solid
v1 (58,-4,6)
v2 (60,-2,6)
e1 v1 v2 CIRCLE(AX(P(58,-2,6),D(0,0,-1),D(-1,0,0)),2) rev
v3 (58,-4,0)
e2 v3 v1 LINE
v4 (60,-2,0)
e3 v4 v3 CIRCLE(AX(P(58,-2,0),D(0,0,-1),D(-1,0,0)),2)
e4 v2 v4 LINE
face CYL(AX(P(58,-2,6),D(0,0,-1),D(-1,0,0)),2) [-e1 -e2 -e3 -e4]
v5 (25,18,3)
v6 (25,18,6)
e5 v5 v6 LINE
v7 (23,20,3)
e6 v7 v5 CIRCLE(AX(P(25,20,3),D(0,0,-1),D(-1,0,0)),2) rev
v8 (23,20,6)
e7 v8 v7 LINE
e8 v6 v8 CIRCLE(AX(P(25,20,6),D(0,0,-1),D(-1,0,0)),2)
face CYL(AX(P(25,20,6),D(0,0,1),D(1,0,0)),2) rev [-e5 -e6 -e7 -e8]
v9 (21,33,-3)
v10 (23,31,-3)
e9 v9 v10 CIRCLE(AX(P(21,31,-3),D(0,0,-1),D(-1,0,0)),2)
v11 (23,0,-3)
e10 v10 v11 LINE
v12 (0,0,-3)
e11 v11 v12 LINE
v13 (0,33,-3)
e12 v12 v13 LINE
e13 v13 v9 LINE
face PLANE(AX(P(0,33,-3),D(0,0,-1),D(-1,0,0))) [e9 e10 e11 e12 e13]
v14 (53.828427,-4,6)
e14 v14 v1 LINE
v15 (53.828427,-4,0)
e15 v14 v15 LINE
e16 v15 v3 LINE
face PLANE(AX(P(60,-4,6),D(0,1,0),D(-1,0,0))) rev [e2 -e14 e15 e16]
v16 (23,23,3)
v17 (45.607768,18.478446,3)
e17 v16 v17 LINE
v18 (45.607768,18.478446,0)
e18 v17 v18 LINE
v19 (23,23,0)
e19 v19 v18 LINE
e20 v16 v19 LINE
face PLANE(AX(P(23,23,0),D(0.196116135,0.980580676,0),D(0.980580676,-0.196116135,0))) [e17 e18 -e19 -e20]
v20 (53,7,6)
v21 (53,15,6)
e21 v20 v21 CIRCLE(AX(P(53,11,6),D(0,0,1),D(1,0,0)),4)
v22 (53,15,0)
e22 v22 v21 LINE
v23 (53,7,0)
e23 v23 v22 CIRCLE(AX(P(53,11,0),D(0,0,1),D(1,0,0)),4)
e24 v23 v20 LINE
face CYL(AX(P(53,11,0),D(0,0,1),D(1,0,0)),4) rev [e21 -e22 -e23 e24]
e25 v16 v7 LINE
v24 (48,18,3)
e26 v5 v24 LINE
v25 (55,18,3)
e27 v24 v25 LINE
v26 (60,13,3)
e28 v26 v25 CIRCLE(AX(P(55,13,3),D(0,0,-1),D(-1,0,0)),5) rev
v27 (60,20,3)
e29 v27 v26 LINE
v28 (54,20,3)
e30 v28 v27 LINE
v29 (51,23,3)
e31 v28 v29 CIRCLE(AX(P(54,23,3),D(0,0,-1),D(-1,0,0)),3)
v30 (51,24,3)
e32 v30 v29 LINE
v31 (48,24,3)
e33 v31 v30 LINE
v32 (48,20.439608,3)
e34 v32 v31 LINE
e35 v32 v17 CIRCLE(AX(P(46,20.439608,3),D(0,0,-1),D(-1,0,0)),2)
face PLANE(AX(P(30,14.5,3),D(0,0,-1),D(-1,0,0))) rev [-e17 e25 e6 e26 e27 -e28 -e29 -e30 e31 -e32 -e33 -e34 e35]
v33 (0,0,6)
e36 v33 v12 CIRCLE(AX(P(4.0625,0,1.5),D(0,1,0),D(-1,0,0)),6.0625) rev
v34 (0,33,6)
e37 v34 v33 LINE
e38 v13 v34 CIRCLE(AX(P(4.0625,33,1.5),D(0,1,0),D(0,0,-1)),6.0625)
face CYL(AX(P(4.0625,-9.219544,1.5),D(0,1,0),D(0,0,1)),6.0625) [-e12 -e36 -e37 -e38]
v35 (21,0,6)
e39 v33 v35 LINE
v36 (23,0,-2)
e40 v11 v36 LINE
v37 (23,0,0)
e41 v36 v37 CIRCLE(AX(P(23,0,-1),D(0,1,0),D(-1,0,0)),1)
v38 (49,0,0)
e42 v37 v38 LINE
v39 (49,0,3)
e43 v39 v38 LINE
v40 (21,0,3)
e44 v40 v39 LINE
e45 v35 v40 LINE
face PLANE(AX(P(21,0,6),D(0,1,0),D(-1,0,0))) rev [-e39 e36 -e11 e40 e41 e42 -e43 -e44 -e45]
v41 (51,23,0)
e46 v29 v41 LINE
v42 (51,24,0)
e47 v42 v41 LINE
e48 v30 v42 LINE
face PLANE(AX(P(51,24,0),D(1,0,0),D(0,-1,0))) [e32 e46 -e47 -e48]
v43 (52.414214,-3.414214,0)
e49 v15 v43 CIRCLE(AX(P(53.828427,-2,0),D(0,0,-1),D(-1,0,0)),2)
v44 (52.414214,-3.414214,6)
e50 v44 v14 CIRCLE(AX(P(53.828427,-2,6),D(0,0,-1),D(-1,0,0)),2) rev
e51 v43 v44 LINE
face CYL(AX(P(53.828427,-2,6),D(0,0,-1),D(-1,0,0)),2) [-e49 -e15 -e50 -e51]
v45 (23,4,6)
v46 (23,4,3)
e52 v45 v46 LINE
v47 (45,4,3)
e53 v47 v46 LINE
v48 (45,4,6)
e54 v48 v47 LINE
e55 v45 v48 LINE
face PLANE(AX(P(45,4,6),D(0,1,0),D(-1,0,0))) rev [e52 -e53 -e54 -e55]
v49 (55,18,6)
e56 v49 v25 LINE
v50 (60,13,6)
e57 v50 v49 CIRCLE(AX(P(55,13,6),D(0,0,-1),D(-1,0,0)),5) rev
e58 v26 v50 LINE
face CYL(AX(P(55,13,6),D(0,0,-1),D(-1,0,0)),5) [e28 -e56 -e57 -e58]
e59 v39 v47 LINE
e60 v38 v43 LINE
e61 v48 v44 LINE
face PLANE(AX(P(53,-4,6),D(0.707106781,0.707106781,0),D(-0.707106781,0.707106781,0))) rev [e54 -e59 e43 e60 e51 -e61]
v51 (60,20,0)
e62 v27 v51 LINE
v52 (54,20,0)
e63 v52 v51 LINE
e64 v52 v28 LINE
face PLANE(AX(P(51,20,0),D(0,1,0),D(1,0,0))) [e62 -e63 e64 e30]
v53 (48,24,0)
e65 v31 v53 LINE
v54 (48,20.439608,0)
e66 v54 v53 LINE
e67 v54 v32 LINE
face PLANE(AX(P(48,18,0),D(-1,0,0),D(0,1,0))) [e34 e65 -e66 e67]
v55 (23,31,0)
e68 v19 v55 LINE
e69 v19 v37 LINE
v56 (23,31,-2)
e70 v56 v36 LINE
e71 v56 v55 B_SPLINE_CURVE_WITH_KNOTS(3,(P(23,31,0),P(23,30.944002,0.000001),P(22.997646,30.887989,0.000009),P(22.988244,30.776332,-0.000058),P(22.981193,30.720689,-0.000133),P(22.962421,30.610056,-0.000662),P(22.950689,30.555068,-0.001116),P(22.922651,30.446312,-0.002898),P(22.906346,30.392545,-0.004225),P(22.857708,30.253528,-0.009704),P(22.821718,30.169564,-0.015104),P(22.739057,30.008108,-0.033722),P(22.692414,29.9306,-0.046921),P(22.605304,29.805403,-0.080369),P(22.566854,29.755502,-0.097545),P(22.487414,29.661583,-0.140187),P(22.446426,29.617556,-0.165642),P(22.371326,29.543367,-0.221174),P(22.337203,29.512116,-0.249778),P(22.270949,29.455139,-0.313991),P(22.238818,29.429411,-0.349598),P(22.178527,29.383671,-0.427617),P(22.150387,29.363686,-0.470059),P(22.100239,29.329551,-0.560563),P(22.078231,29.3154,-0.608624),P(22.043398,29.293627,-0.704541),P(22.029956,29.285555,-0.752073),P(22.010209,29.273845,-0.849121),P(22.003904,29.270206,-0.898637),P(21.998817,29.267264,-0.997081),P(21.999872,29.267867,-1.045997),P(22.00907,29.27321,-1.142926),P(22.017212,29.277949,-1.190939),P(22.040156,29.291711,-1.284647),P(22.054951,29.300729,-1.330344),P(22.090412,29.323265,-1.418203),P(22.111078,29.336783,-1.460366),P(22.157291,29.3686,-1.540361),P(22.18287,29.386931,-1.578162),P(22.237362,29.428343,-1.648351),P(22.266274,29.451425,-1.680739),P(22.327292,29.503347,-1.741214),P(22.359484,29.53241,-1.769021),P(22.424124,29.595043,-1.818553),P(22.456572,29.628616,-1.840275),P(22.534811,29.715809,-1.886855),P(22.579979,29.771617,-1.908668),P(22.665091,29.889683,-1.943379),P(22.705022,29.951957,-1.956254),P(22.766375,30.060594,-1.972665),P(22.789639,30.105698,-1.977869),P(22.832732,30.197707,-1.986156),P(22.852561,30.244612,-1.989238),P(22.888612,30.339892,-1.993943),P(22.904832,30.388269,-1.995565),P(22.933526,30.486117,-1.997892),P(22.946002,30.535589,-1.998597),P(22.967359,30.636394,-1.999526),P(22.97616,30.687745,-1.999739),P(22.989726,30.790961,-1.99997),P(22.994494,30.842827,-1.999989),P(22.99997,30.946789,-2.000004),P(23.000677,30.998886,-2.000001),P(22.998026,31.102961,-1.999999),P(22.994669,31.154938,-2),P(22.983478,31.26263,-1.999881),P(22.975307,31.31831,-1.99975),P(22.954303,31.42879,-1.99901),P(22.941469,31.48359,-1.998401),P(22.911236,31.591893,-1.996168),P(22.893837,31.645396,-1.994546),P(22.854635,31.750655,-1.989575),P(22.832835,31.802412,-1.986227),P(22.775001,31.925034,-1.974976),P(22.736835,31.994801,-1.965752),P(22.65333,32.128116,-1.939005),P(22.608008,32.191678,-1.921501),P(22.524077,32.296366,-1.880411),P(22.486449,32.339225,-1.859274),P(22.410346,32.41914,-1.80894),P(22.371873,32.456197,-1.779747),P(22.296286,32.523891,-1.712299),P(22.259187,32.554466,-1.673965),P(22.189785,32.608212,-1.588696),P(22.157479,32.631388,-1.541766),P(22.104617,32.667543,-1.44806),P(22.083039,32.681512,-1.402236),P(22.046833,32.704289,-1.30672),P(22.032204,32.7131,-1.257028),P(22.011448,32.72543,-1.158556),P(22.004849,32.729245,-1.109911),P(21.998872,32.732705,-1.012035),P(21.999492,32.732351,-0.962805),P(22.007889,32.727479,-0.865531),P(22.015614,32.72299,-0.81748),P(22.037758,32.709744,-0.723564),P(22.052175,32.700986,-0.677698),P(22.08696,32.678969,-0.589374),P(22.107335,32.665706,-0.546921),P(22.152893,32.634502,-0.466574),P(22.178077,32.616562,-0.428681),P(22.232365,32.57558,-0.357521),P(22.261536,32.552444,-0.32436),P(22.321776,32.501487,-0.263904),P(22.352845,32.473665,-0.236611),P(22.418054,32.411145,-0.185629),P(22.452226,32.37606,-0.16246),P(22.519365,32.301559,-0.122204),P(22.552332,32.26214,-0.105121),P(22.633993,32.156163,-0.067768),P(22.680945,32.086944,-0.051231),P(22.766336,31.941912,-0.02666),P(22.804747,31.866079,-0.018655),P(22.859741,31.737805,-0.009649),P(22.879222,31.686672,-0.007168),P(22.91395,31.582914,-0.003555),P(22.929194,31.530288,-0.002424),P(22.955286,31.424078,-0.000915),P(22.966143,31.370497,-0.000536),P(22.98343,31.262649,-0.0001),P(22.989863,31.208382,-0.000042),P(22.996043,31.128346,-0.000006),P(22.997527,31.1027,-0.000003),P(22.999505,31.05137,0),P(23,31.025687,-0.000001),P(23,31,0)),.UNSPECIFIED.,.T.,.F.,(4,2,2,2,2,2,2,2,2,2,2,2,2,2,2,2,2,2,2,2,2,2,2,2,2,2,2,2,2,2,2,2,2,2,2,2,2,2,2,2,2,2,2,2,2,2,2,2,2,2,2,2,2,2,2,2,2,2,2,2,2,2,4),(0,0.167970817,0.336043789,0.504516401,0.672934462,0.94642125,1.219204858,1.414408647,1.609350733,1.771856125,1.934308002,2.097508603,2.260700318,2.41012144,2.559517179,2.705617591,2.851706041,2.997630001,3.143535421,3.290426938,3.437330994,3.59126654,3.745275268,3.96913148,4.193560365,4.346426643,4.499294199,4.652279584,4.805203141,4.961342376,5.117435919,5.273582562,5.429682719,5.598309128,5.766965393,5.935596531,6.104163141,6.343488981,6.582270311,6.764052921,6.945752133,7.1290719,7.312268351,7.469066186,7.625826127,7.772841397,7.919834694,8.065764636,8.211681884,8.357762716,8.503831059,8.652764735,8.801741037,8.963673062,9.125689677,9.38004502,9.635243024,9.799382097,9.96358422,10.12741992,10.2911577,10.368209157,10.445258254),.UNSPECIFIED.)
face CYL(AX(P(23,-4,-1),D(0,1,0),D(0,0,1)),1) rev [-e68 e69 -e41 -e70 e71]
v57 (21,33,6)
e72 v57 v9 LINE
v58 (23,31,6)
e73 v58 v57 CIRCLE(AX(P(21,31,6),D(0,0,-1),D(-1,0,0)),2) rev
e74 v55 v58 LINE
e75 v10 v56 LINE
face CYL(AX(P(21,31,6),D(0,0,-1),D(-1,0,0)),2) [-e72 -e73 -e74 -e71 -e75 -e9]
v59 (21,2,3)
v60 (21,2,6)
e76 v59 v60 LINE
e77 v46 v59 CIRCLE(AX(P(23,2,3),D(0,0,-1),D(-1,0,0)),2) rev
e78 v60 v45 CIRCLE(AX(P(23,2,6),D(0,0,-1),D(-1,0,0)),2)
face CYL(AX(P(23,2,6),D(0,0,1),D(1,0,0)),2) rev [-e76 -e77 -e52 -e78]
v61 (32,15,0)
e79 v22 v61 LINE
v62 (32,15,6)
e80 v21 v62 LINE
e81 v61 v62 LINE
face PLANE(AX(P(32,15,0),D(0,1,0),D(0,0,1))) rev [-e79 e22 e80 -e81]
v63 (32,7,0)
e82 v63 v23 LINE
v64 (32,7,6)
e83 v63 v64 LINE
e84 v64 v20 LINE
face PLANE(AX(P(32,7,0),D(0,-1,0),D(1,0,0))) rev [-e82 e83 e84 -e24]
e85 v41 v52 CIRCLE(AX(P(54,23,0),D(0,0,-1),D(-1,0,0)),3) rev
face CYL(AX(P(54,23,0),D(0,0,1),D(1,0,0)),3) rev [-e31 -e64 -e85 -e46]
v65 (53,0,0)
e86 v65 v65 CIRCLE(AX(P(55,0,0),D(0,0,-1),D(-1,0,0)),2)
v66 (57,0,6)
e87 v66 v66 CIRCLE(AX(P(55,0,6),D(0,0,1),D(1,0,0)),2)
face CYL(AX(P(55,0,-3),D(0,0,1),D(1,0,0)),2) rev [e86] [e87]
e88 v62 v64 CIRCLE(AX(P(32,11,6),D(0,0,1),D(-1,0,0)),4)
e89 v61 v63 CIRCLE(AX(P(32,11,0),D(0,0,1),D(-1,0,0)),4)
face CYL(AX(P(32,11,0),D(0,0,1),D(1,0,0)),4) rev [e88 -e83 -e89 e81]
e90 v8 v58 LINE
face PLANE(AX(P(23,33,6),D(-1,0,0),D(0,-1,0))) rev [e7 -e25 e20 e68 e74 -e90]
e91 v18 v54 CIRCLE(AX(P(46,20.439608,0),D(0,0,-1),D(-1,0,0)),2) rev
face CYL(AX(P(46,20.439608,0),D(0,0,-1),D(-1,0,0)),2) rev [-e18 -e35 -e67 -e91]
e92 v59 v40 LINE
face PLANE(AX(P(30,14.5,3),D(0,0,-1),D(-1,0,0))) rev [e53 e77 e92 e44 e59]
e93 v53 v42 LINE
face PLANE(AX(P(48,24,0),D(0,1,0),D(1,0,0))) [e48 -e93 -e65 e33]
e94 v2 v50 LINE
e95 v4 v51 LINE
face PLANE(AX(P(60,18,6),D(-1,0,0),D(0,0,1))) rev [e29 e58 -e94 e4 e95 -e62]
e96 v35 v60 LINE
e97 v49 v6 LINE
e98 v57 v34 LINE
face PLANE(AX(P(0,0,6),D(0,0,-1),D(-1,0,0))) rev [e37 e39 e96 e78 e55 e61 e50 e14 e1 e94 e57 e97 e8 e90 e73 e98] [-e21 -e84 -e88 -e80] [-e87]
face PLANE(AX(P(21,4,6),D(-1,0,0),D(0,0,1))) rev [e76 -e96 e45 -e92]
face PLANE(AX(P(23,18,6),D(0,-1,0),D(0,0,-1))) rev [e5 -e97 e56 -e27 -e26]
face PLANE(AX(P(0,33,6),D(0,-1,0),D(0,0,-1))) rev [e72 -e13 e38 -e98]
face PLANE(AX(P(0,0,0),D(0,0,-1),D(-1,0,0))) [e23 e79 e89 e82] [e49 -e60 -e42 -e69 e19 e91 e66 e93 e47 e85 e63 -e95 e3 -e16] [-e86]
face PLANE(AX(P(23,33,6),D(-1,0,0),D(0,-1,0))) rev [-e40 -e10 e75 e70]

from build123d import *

# Parameters (mm, degrees)
EXTRUSION1_DEPTH        = 6
NERVURE1_REACH          = 70.739
ESQUISSE2_WALL_W        = 167.477270848
ESQUISSE2_WALL_H        = 3
ENL_V_MAT_EXTRU_1_DEPTH = 69.738635424
NERVURE2_REACH          = 70.739
ESQUISSE4_WALL_W        = 164.972368416
ESQUISSE4_WALL_H        = 3
CONG_1_R                = 2
CONG_3_R                = 5
NERVURE4_START          = -3
NERVURE4_DEPTH          = 3
CONG_4_R                = 3
CONG_5_R                = 2
ESQUISSE6_W             = 23
ESQUISSE6_H             = 33
EXTRUSION2_DEPTH        = 3
EXTRUSION3_DEPTH        = 33
CONG_7_R                = 2
ESQUISSE9_R             = 1
ENL_V_MAT_EXTRU_2_DEPTH = 71.746024717
ESQUISSE10_R            = 2
ENL_V_MAT_EXTRU_3_DEPTH = 70.065186747


# Read off the part's stored shape, not the designer's step: Nervure4
with BuildPart() as part:
    # Esquisse1 → Extrusion1 (new body)
    with BuildSketch(Plane.XY):
        Polygon((0, 0), (0, 33), (23, 33), (23, 18), (60, 18), (60, -4), (53, -4), (45, 4), (21, 4), (21, 0), align=None)
    extrude(amount=EXTRUSION1_DEPTH)

    # Esquisse2 wall → Nervure1 (add, up to next)
    with BuildSketch(Plane(origin=(35, 0, 0), x_dir=(1, 0, 0), z_dir=(0, -1, 0)), mode=Mode.PRIVATE) as nervure1_sk1:
        with Locations((0, 1.5)):
            Rectangle(ESQUISSE2_WALL_W, ESQUISSE2_WALL_H)
    nervure1_tool1 = extrude(nervure1_sk1.sketch, amount=-NERVURE1_REACH, mode=Mode.PRIVATE) - part.part
    add(nervure1_tool1.solids().sort_by_distance((35, 0, 0))[0])

    # Esquisse3 → Enlèv. mat.-Extru.1 (cut, through all)
    with BuildSketch(Plane.XY.offset(6)):
        with BuildLine():
            Line((32, 15), (53, 15))
            ThreePointArc((53, 15), (57, 11), (53, 7))
            Line((53, 7), (32, 7))
            ThreePointArc((32, 7), (28, 11), (32, 15))
        make_face()
    extrude(amount=-ENL_V_MAT_EXTRU_1_DEPTH, mode=Mode.SUBTRACT)

    # Esquisse4 wall → Nervure2 (add, up to next)
    with BuildSketch(Plane(origin=(35.5, 20.5, 0), x_dir=(0.980580675691, -0.196116135138, 0), z_dir=(-0.196116135138, -0.980580675691, 0)), mode=Mode.PRIVATE) as nervure2_sk1:
        with Locations((0, 1.5)):
            Rectangle(ESQUISSE4_WALL_W, ESQUISSE4_WALL_H)
    nervure2_tool1 = extrude(nervure2_sk1.sketch, amount=NERVURE2_REACH, mode=Mode.PRIVATE) - part.part
    add(nervure2_tool1.solids().sort_by_distance((35.5, 20.5, 0))[0])

    # Congé1
    cong_1_edges = [part.edges().sort_by_distance(p)[0] for p in [
        (23, 18, 4.5),
        (21, 4, 4.5),
    ]]
    fillet(cong_1_edges, radius=CONG_1_R)

    # Congé3
    cong_3_edges = [part.edges().sort_by_distance(p)[0] for p in [
        (60, 18, 3),
    ]]
    fillet(cong_3_edges, radius=CONG_3_R)

    # Nervure4 outline → Nervure4 (add)
    with BuildSketch(Plane(origin=(0, 0, 0), x_dir=(-1, 0, 0), z_dir=(0, 0, -1)).offset(NERVURE4_START)):
        with BuildLine():
            Line((-60, 20), (-60, 13))
            ThreePointArc((-60, 13), (-58.535533906, 16.535533906), (-55, 18))
            Line((-55, 18), (-48, 18))
            Line((-48, 18), (-48, 24))
            Line((-48, 24), (-51, 24))
            Line((-51, 24), (-51, 20))
            Line((-51, 20), (-60, 20))
        make_face()
    extrude(amount=NERVURE4_DEPTH)

    # Congé4
    cong_4_edges = [part.edges().sort_by_distance(p)[0] for p in [
        (51, 20, 1.5),
    ]]
    fillet(cong_4_edges, radius=CONG_4_R)

    # Congé5
    cong_5_edges = [part.edges().sort_by_distance(p)[0] for p in [
        (48, 18, 1.5),
    ]]
    fillet(cong_5_edges, radius=CONG_5_R)

    # Esquisse6 → Extrusion2 (add)
    with BuildSketch(Plane(origin=(0, 0, 0), x_dir=(-1, 0, 0), z_dir=(0, 0, -1))):
        with Locations((-11.5, 16.5)):
            Rectangle(ESQUISSE6_W, ESQUISSE6_H)
    extrude(amount=EXTRUSION2_DEPTH)

    # Esquisse8 → Extrusion3 (add)
    with BuildSketch(Plane(origin=(0, 33, 0), x_dir=(1, 0, 0), z_dir=(0, 1, 0))):
        with BuildLine():
            Line((0, 3), (0, -6))
            ThreePointArc((0, -6), (-2, -1.5), (0, 3))
        make_face()
    extrude(amount=-EXTRUSION3_DEPTH)

    # Congé7
    cong_7_edges = [part.edges().sort_by_distance(p)[0] for p in [
        (23, 33, 1.5),
        (60, -4, 3),
        (53, -4, 3),
    ]]
    fillet(cong_7_edges, radius=CONG_7_R)

    # Esquisse9 → Enlèv. mat.-Extru.2 (cut, through all)
    with BuildSketch(Plane(origin=(0, 33, 0), x_dir=(1, 0, 0), z_dir=(0, 1, 0))):
        with Locations((23, 1)):
            Circle(ESQUISSE9_R)
    extrude(amount=-ENL_V_MAT_EXTRU_2_DEPTH, mode=Mode.SUBTRACT)

    # Esquisse10 → Enlèv. mat.-Extru.3 (cut, through all)
    with BuildSketch(Plane.XY.offset(6)):
        with Locations((55, 0)):
            Circle(ESQUISSE10_R)
    extrude(amount=-ENL_V_MAT_EXTRU_3_DEPTH, mode=Mode.SUBTRACT)


solid = part.part
